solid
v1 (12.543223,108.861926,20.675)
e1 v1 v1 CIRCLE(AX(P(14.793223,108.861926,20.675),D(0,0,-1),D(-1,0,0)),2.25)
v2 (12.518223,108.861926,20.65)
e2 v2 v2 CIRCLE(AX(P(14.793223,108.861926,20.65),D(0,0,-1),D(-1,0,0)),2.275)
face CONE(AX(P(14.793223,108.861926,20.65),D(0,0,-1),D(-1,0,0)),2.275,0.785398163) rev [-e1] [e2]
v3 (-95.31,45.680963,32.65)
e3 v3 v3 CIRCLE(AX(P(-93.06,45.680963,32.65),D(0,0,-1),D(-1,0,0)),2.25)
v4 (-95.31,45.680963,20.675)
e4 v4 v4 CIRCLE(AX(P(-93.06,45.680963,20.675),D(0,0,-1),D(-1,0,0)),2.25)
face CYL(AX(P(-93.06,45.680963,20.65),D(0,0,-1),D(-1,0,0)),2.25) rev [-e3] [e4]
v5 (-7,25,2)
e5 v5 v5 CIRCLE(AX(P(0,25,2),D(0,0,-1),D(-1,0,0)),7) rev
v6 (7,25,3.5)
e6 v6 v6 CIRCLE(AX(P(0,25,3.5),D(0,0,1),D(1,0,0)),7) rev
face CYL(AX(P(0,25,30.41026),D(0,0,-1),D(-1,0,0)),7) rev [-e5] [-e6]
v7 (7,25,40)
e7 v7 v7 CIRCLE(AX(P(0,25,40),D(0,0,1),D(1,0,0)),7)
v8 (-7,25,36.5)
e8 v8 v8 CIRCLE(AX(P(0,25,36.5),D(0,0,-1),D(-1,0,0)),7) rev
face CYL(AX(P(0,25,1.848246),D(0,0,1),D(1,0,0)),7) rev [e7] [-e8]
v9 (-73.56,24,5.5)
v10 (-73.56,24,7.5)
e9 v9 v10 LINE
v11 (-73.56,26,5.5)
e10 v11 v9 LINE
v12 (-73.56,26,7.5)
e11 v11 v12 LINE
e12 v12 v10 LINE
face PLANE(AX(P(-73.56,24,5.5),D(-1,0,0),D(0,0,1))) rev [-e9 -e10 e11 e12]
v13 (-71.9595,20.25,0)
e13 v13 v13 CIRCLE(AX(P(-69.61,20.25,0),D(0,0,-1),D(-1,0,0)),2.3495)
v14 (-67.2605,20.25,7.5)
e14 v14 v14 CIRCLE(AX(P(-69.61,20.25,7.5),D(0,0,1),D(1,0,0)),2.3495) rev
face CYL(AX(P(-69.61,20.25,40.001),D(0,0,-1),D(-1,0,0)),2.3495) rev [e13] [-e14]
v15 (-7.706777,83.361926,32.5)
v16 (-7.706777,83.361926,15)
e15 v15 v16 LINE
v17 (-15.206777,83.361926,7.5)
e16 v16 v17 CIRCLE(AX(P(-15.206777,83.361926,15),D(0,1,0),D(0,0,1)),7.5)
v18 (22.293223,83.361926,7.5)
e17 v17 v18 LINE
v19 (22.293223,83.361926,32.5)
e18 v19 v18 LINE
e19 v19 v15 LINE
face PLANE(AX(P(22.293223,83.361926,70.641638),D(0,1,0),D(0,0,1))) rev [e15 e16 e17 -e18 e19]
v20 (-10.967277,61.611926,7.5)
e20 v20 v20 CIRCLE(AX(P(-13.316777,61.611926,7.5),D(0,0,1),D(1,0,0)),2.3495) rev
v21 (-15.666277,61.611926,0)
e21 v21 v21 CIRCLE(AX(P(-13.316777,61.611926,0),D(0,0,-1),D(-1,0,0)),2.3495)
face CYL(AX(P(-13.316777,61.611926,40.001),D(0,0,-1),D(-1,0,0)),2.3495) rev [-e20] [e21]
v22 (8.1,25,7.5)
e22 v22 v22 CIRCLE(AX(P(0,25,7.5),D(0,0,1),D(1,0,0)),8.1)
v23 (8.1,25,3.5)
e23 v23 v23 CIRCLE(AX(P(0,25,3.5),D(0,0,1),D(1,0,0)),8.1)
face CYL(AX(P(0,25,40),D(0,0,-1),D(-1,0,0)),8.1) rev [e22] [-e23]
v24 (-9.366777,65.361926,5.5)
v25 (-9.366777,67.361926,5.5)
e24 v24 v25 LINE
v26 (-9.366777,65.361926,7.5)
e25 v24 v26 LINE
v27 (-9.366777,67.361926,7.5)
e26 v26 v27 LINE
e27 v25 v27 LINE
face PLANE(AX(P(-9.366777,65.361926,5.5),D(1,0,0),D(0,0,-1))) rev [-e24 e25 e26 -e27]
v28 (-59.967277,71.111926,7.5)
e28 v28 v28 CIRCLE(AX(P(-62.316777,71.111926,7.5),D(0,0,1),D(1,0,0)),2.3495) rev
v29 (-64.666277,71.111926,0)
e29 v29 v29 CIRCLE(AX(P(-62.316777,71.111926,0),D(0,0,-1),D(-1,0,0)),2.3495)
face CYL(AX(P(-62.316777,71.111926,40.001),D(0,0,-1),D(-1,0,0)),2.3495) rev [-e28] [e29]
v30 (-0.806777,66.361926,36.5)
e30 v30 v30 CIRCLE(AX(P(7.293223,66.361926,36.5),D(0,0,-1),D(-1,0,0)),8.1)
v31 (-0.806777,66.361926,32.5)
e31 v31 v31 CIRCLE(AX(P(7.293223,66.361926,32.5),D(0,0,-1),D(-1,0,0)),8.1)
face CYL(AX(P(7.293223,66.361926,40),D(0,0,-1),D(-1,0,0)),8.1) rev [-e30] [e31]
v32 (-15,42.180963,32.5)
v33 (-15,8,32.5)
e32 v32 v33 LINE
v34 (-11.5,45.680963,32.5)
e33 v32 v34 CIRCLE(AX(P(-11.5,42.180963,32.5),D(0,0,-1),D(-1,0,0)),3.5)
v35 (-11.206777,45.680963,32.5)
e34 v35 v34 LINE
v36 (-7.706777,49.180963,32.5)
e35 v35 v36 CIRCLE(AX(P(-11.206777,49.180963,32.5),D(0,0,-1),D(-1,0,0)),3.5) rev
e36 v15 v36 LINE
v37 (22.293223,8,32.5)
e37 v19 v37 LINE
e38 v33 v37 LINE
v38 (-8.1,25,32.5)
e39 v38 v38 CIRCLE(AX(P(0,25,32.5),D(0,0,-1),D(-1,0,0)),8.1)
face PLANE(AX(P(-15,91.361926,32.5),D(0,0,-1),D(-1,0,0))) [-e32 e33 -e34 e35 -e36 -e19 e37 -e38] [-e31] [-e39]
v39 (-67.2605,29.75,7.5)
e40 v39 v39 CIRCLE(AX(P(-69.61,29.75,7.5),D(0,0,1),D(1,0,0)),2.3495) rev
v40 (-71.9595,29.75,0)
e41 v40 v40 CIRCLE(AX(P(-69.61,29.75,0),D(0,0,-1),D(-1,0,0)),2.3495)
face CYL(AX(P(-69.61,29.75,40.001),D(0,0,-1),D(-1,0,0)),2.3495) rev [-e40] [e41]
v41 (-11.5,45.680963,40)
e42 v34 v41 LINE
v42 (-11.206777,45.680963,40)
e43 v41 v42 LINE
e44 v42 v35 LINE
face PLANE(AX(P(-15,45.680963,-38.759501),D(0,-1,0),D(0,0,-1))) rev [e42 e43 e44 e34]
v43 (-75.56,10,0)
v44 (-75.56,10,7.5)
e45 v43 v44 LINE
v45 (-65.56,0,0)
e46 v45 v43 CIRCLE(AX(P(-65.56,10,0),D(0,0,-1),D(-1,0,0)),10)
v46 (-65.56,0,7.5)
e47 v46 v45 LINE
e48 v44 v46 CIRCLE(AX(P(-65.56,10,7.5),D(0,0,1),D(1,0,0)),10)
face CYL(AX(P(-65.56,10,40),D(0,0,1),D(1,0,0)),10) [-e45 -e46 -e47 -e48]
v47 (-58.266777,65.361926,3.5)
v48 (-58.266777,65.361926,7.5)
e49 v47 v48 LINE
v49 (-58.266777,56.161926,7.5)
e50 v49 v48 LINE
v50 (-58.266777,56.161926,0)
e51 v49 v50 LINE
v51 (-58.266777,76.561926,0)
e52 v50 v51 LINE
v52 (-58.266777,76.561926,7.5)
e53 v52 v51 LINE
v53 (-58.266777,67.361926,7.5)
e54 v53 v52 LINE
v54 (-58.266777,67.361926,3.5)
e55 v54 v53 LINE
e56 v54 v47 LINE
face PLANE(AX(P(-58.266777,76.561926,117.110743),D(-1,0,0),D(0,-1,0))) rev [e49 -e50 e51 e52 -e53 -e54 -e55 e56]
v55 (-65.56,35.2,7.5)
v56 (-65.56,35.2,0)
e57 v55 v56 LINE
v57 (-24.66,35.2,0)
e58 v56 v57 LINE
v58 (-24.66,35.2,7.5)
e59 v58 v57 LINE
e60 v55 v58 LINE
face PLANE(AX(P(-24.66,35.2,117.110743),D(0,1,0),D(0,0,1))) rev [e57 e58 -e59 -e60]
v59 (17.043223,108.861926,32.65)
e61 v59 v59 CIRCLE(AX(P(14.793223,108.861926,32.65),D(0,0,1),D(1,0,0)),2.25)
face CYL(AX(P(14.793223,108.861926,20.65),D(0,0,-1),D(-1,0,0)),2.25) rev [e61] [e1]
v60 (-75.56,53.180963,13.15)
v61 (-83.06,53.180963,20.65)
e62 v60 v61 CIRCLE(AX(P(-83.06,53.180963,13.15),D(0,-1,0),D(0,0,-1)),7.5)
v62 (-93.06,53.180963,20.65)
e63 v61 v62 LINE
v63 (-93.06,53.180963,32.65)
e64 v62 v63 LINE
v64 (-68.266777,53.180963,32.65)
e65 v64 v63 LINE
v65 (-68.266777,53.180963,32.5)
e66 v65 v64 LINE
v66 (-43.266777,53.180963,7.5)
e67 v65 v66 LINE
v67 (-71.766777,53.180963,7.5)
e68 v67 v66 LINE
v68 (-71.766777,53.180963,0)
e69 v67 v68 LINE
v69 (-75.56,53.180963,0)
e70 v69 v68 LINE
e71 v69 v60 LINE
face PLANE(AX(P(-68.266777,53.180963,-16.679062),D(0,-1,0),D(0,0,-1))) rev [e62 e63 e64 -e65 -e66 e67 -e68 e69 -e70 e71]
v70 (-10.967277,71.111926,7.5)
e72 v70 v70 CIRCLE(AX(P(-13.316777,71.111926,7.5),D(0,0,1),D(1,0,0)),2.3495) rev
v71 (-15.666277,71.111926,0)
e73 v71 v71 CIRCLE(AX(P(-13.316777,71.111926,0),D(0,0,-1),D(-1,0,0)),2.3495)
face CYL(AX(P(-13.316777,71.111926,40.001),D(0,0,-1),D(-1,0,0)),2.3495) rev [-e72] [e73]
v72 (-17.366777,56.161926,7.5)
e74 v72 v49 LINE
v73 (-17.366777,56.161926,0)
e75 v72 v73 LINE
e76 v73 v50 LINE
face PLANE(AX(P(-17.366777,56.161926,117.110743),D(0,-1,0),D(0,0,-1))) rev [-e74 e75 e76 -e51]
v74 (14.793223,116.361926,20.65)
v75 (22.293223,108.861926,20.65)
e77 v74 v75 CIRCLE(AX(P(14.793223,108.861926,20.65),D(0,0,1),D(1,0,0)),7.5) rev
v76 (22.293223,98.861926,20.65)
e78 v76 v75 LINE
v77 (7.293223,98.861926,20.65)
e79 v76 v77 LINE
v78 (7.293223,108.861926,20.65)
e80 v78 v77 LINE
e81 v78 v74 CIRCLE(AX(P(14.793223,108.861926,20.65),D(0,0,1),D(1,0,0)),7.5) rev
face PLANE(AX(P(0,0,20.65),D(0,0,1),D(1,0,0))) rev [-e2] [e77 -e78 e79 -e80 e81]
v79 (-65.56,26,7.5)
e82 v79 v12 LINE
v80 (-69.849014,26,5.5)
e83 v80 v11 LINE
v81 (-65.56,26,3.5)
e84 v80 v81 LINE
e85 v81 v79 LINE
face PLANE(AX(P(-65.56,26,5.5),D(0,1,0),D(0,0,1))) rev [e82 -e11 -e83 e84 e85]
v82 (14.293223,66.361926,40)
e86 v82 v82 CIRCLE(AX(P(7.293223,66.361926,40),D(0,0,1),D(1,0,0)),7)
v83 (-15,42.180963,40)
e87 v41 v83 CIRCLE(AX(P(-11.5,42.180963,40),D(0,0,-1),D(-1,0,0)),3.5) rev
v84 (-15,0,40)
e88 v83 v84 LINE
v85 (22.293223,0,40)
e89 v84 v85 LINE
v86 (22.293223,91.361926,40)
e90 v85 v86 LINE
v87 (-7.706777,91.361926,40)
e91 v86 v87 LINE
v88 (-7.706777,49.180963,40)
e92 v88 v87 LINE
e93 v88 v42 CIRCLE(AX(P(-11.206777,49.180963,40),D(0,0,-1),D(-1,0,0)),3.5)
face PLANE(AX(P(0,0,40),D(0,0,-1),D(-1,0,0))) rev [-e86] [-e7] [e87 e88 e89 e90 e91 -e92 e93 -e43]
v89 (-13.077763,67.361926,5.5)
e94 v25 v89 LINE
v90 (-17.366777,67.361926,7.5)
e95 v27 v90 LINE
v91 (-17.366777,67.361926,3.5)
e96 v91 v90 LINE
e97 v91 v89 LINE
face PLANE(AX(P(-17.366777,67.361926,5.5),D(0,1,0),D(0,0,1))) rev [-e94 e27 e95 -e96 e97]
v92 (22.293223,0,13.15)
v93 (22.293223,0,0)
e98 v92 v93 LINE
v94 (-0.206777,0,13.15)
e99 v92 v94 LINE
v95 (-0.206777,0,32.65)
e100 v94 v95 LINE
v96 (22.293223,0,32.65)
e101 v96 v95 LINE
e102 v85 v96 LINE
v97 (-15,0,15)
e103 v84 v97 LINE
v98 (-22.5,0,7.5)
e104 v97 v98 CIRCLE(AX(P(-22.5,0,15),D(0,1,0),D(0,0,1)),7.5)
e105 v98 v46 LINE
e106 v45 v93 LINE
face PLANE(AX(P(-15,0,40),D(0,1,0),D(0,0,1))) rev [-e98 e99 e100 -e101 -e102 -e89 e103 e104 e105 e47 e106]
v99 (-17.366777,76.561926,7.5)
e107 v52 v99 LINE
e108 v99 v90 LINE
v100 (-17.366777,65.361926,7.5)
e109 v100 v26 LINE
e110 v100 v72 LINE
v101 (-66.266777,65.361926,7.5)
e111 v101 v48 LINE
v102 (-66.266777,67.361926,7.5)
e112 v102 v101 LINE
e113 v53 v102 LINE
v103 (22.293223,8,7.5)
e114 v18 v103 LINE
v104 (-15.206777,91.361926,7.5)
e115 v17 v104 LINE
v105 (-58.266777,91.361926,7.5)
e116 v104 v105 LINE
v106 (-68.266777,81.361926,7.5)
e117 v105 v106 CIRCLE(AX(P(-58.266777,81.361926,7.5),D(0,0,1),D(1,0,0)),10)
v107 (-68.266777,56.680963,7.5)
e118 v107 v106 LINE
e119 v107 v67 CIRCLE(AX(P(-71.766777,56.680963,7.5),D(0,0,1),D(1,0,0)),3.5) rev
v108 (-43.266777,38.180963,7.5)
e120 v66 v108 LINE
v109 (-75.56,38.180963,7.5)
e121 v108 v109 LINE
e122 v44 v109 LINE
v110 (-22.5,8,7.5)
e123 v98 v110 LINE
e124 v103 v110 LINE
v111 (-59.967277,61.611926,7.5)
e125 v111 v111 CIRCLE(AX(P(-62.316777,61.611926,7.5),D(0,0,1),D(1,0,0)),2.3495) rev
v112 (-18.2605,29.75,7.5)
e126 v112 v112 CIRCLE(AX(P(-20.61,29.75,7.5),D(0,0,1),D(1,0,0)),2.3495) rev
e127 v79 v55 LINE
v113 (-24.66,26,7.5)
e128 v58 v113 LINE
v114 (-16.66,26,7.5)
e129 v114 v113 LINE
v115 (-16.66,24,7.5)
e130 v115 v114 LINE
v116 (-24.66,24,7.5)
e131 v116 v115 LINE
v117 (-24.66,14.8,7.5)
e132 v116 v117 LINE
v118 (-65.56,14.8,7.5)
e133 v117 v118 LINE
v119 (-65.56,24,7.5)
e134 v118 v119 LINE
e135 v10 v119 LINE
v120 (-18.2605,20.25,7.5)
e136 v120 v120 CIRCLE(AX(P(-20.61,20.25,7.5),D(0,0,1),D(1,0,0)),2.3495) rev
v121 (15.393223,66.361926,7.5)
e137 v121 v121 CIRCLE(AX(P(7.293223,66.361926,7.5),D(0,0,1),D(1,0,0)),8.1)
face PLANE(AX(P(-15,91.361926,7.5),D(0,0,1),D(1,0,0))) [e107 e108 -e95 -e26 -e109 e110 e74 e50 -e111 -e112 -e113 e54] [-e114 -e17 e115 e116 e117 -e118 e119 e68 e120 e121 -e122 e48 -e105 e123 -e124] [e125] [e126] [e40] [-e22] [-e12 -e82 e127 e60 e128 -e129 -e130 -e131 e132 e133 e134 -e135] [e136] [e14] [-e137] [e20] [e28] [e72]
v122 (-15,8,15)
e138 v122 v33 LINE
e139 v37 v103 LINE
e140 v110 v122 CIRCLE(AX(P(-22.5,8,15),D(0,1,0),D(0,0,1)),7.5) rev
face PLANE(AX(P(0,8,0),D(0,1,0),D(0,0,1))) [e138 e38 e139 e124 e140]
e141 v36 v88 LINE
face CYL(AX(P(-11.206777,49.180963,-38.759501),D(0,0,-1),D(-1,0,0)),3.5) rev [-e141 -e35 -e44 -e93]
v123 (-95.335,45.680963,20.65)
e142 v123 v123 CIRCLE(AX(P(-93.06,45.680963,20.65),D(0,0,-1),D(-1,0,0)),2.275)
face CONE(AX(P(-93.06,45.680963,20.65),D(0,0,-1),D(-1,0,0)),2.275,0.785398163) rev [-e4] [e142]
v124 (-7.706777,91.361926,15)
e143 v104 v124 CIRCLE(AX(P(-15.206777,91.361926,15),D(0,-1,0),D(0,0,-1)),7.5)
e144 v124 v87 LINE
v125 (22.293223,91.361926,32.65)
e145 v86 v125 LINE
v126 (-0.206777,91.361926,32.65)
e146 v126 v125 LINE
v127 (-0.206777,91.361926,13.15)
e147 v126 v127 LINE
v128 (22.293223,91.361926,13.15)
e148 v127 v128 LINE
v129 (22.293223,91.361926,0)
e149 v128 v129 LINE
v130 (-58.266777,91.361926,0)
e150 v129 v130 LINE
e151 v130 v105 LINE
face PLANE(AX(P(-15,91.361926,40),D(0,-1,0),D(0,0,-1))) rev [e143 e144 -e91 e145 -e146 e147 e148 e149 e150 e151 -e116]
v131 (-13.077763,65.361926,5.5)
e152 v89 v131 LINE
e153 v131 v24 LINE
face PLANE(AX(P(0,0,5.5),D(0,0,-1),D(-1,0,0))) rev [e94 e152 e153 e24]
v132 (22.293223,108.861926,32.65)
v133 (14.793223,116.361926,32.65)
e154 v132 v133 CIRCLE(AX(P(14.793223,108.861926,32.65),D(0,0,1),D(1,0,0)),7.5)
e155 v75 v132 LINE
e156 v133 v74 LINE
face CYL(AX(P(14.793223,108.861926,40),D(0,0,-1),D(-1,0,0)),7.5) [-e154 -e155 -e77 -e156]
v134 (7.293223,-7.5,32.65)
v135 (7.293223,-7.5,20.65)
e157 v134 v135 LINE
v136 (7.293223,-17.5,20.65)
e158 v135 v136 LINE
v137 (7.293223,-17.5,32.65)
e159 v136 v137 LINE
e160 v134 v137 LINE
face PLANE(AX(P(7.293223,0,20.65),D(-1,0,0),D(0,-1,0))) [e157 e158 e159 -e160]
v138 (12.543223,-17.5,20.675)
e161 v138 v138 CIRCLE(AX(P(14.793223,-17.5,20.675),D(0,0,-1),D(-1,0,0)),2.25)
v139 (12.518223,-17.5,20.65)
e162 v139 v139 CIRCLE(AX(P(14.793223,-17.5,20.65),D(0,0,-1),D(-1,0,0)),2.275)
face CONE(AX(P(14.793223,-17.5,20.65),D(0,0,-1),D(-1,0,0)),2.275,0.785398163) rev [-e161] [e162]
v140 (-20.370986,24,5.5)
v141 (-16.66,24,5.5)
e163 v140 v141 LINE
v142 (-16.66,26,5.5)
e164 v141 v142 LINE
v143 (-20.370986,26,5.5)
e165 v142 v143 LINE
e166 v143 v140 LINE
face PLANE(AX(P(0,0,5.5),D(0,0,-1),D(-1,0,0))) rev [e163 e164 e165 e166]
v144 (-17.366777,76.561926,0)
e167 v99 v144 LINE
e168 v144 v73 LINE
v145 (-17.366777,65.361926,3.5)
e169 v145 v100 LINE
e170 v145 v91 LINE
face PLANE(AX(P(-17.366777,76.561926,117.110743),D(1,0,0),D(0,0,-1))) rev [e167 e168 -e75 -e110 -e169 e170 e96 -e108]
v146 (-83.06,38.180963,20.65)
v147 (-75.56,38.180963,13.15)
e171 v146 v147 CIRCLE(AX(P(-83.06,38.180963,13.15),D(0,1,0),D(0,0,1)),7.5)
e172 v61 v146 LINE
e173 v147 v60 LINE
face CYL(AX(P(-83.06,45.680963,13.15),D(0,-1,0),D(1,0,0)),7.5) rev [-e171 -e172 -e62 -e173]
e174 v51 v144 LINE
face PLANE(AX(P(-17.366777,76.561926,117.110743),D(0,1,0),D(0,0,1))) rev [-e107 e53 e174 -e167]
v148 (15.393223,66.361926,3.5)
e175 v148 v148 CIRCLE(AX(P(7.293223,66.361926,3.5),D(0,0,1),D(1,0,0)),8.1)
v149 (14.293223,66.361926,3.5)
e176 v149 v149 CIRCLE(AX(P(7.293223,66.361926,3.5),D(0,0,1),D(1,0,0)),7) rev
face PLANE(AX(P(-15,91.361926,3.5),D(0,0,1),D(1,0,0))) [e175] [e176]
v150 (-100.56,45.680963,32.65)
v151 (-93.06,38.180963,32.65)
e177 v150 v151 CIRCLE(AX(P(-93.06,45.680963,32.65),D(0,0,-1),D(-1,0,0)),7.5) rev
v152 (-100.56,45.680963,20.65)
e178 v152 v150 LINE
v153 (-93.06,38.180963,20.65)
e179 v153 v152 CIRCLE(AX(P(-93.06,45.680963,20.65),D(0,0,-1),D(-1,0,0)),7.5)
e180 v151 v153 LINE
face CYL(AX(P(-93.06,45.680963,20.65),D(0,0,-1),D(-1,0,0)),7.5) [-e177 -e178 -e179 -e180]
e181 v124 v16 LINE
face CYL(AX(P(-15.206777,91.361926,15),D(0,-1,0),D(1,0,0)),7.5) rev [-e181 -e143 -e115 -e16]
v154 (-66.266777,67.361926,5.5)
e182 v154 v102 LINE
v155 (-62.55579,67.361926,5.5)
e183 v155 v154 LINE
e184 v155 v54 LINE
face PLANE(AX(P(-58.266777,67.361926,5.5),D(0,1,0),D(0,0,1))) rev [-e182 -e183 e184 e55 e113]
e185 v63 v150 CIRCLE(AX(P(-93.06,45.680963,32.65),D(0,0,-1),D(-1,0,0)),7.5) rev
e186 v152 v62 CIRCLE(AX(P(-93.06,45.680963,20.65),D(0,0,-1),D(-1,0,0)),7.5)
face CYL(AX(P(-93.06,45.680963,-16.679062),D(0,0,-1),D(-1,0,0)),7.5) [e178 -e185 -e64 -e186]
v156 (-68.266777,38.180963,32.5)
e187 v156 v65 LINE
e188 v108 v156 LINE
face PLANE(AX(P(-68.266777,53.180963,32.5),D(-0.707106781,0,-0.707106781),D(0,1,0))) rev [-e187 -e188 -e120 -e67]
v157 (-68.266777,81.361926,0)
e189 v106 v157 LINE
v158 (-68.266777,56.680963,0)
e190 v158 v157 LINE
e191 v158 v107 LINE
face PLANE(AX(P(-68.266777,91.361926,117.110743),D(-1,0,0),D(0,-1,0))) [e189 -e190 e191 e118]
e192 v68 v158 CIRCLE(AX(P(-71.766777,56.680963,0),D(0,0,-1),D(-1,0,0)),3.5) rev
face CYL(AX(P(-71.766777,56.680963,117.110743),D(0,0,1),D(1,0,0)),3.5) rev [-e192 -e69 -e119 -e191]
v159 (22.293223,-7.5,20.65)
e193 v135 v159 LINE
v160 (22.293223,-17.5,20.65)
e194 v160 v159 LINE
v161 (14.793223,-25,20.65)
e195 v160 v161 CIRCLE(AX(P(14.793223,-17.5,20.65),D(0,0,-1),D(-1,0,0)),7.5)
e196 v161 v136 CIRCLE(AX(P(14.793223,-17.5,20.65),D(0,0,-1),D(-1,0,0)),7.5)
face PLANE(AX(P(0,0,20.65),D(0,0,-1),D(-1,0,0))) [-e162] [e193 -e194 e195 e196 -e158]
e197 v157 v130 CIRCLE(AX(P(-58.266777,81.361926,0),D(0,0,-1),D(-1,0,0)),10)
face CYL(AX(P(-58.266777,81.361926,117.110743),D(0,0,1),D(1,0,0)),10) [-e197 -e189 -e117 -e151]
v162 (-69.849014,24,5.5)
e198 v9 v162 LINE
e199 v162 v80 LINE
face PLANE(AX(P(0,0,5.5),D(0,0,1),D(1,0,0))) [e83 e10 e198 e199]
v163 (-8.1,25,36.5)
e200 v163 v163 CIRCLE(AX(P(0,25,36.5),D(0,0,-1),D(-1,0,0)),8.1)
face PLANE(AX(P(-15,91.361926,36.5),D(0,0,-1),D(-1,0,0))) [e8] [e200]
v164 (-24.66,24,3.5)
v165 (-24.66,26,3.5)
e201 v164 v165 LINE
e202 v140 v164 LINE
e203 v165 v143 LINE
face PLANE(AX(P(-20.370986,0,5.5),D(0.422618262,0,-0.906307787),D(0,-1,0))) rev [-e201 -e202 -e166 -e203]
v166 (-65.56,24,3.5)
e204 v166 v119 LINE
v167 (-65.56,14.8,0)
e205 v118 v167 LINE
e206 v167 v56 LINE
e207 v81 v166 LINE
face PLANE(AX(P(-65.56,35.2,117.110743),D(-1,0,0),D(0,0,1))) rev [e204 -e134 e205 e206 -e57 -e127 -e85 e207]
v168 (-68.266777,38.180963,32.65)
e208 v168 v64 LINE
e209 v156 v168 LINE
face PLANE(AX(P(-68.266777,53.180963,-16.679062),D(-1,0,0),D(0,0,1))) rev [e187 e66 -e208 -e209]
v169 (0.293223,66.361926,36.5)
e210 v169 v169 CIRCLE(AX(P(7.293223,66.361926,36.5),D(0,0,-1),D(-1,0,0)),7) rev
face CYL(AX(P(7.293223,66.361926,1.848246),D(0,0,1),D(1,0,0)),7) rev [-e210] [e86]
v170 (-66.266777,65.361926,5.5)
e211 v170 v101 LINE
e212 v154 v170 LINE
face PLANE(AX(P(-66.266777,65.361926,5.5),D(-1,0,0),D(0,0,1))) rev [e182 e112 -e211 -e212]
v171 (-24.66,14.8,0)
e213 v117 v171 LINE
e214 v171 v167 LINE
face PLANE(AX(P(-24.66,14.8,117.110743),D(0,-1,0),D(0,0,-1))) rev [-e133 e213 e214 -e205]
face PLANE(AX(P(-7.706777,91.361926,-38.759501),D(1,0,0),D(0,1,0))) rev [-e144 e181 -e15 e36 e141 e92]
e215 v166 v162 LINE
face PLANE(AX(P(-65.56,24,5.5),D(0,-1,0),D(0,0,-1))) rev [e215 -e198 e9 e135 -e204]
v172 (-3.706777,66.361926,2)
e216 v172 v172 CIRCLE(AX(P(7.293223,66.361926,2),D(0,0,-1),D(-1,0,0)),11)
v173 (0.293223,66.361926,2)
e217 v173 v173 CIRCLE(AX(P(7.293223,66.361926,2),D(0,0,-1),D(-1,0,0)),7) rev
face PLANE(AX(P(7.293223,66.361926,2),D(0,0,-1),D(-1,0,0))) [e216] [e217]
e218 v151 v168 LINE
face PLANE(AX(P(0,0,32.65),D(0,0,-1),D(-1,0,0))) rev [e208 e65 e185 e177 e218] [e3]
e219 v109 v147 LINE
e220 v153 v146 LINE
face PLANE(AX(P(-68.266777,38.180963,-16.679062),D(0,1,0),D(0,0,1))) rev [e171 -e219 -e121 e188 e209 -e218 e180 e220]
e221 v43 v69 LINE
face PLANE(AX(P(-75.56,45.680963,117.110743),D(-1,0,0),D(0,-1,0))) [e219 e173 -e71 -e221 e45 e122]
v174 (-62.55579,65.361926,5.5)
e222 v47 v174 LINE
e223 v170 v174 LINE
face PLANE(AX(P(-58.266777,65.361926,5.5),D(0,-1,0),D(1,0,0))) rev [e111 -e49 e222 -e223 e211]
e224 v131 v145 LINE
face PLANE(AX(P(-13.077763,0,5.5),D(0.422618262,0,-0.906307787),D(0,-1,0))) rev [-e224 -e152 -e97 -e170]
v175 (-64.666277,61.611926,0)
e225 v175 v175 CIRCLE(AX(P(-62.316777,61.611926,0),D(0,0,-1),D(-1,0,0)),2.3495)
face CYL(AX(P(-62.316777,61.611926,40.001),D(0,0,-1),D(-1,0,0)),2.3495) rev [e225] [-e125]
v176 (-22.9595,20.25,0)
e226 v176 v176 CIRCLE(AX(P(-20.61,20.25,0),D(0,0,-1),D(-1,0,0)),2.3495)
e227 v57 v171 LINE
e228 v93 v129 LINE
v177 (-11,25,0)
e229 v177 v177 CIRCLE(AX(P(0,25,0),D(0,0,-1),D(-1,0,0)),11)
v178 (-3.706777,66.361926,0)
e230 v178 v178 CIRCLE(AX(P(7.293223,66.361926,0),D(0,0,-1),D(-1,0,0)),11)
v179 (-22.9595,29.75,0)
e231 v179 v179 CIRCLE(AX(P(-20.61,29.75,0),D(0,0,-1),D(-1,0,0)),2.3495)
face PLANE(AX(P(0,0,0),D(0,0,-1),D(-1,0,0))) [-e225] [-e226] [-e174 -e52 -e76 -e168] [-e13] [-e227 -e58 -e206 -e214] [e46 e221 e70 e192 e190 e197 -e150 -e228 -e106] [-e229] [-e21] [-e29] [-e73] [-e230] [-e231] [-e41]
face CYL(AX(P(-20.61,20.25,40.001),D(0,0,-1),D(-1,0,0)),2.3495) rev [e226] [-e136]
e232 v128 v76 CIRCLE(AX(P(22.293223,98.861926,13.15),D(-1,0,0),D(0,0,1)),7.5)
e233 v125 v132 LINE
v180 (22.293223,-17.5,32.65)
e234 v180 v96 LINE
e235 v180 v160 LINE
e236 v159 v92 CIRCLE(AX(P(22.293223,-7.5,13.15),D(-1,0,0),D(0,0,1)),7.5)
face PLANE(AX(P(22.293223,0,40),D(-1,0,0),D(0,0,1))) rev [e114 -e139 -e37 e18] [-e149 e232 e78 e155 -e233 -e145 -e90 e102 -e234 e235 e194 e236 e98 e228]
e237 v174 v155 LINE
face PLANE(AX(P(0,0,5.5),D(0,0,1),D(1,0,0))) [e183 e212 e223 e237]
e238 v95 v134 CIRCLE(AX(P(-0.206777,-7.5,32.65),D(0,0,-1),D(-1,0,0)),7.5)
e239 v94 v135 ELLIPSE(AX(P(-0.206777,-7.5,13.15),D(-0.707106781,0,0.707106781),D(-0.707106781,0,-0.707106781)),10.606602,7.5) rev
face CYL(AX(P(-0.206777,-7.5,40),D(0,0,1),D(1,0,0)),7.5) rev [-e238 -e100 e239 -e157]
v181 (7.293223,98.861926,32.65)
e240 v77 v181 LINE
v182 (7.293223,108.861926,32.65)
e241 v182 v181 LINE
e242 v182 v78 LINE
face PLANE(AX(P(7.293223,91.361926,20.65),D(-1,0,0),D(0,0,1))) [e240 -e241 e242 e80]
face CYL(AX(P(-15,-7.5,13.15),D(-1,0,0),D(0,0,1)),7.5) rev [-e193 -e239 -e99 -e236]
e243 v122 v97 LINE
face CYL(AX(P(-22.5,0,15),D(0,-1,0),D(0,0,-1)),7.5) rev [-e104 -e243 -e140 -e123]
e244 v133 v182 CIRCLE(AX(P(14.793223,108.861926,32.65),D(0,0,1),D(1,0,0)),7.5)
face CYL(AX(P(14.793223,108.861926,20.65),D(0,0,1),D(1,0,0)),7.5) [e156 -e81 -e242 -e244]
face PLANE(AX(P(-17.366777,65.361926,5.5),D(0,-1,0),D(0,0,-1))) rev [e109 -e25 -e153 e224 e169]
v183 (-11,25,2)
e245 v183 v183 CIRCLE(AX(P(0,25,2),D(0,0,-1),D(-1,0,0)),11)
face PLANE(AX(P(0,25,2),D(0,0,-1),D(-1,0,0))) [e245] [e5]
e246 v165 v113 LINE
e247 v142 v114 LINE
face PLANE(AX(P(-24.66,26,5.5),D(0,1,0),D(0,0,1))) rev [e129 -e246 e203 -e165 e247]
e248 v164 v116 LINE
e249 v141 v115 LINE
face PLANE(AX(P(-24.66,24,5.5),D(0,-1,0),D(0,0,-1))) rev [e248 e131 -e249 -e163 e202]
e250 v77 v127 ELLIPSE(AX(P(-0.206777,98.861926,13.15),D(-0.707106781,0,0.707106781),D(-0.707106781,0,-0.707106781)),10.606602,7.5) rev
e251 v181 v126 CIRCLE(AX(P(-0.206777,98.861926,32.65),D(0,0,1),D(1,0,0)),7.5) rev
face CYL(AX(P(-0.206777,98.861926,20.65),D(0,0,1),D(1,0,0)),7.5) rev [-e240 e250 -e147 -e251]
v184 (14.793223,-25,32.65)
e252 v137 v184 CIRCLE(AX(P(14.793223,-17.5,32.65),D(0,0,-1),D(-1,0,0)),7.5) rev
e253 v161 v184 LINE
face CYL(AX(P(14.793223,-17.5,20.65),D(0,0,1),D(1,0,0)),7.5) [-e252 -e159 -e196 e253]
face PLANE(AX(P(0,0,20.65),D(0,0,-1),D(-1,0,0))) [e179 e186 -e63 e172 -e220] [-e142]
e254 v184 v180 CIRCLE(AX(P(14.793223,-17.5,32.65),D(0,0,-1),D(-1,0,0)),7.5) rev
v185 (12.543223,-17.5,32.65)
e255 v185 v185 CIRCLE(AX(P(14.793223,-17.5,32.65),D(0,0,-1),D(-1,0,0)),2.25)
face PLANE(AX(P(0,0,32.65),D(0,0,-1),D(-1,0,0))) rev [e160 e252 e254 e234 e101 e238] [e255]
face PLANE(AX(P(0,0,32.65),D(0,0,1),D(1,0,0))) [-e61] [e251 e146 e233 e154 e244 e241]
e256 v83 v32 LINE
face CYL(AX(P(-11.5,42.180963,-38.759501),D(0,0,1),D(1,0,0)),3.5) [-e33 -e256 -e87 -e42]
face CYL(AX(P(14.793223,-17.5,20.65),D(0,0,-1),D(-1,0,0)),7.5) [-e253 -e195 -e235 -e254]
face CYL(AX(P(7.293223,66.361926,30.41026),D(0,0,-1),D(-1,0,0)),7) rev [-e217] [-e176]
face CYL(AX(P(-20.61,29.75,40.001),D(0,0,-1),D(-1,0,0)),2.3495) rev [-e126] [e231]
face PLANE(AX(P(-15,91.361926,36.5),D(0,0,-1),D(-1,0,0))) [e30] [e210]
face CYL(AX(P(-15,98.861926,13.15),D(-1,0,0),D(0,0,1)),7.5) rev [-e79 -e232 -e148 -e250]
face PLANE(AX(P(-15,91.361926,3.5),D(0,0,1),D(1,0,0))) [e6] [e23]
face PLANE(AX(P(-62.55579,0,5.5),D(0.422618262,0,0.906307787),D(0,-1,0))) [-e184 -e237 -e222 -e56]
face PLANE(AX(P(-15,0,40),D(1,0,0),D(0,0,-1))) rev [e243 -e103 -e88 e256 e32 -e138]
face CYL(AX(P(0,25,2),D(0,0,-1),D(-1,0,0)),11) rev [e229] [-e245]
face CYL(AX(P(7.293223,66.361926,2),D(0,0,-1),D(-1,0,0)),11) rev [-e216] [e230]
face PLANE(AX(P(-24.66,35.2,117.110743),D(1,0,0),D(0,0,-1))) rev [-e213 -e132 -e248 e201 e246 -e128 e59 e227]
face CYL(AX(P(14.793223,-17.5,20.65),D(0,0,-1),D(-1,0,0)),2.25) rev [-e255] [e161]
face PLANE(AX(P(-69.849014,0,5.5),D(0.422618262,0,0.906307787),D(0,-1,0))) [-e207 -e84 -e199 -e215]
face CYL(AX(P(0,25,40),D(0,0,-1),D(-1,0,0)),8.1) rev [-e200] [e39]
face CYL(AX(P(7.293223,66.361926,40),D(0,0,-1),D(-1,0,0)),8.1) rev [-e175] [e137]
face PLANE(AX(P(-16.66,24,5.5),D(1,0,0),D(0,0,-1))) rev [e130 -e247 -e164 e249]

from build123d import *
from OCP.BRepFilletAPI import BRepFilletAPI_MakeChamfer

# Parameters (mm, degrees)
SKETCH1_W                      = 37.293223462
SKETCH1_H                      = 91.361925627
SKETCH1_R                      = 8.1
BOSS_EXTRUDE1_DEPTH            = 40
CUT_EXTRUDE1_START             = 8
SKETCH2_W                      = 37.293223462
SKETCH2_H                      = 25
CUT_EXTRUDE1_DEPTH             = 95.195837814
BOSS_EXTRUDE2_START            = -3.5
SKETCH10_R                     = 8.1
SKETCH10_R_2                   = 7
SKETCH10_R_3                   = 10.837031589
BOSS_EXTRUDE2_DEPTH            = 3.5
SKETCH11_R                     = 8.1
SKETCH11_R_2                   = 7
BOSS_EXTRUDE3_DEPTH            = 3.5
SKETCH12_W                     = 40.9
SKETCH12_H                     = 20.4
BOSS_EXTRUDE4_DEPTH            = 7.5
CUT_EXTRUDE2_REACH             = 127.125
SKETCH13_R                     = 2.3495
SKETCH22_W                     = 8
SKETCH22_H                     = 2
CUT_EXTRUDE6_DEPTH             = 2
SKETCH14_W                     = 37.293223462
SKETCH14_H                     = 8
BOSS_EXTRUDE5_DEPTH            = 25
CUT_EXTRUDE4_START             = -32.5
SKETCH18_W                     = 7.293223462
SKETCH18_H                     = 45.680962814
CUT_EXTRUDE4_DEPTH             = 32.5
SKETCH15_R                     = 11
CUT_EXTRUDE3_DEPTH             = 2
SKETCH19_W                     = 15
SKETCH19_H                     = 25
BOSS_EXTRUDE6_DEPTH            = 12
SKETCH20_W                     = 32.293223462
SKETCH20_H                     = 15
BOSS_EXTRUDE7_DEPTH            = 12
SKETCH21_W                     = 7.293223462
SKETCH21_H                     = 15
BOSS_EXTRUDE8_DEPTH            = 20.65
CHAMFER2_SIZE                  = 2
CHAMFER2_SIZE2                 = 4.289013841
FILLET1_R                      = 7.5
CHAMFER1_SIZE                  = 25
M4_CLEARANCE_HOLE1_D           = 4.5
M4_CLEARANCE_HOLE1_CSINK_D     = 4.55
M4_CLEARANCE_HOLE1_CSINK_ANGLE = 90
FILLET2_R                      = 10
FILLET3_R                      = 3.5


with BuildPart() as part:
    # Sketch1 → Boss-Extrude1 (new body)
    with BuildSketch(Plane.XY):
        with Locations((3.646611731, 45.680962814)):
            Rectangle(SKETCH1_W, SKETCH1_H)
        with Locations((0, 25)):
            Circle(SKETCH1_R, mode=Mode.SUBTRACT)
        with Locations((7.293223462, 66.361925627)):
            Circle(SKETCH1_R, mode=Mode.SUBTRACT)
    extrude(amount=BOSS_EXTRUDE1_DEPTH)

    # Sketch2 → Cut-Extrude1 (cut, through all)
    with BuildSketch(Plane(origin=(0, 0, 0), x_dir=(1, 0, 0), z_dir=(0, 1, 0)).offset(CUT_EXTRUDE1_START)):
        with Locations((3.646611731, -20)):
            Rectangle(SKETCH2_W, SKETCH2_H)
    extrude(amount=CUT_EXTRUDE1_DEPTH, mode=Mode.SUBTRACT)

    # Sketch10 → Boss-Extrude2 (add)
    # profile 1 of 2: a face of its own
    with BuildSketch(Plane.XY.offset(40).offset(BOSS_EXTRUDE2_START)):
        with Locations(Location((7.293223462, 66.361925627, 0), (0, 0, 180))):
            Circle(SKETCH10_R)
        with Locations((7.293223462, 66.361925627)):
            Circle(SKETCH10_R_2, mode=Mode.SUBTRACT)
    # profile 2 of 2: a face of its own
    with BuildSketch(Plane.XY.offset(40).offset(BOSS_EXTRUDE2_START)):
        with Locations((0, 25)):
            Circle(SKETCH10_R_3)
        with Locations((0, 25)):
            Circle(SKETCH10_R_2, mode=Mode.SUBTRACT)
    extrude(amount=BOSS_EXTRUDE2_DEPTH)

    # Sketch11 → Boss-Extrude3 (add)
    # profile 1 of 2: a face of its own
    with BuildSketch(Plane(origin=(0, 0, 0), x_dir=(-1, 0, 0), z_dir=(0, 0, -1))):
        with Locations((-7.293223462, 66.361925627)):
            Circle(SKETCH11_R)
        with Locations(Location((-7.293223462, 66.361925627, 0), (0, 0, 180))):
            Circle(SKETCH11_R_2, mode=Mode.SUBTRACT)
    # profile 2 of 2: a face of its own
    with BuildSketch(Plane(origin=(0, 0, 0), x_dir=(-1, 0, 0), z_dir=(0, 0, -1))):
        with Locations((0, 25)):
            Circle(SKETCH11_R)
        with Locations(Location((0, 25, 0), (0, 0, 180))):
            Circle(SKETCH11_R_2, mode=Mode.SUBTRACT)
    extrude(amount=-BOSS_EXTRUDE3_DEPTH)

    # Sketch12 → Boss-Extrude4 (add)
    with BuildSketch(Plane(origin=(0, 0, 0), x_dir=(-1, 0, 0), z_dir=(0, 0, -1))):
        Polygon((15, 0), (75.56, 0), (75.56, 45.680962813), (68.266776538, 45.680962813), (68.266776538, 91.361925627), (15, 91.361925627), align=None)
        with Locations((45.11, 25)):
            Rectangle(SKETCH12_W, SKETCH12_H, mode=Mode.SUBTRACT)
        with Locations((37.816776538, 66.361925627)):
            Rectangle(SKETCH12_W, SKETCH12_H, mode=Mode.SUBTRACT)
    extrude(amount=-BOSS_EXTRUDE4_DEPTH)

    # Sketch13 → Cut-Extrude2 (cut, up to next)
    with BuildSketch(Plane(origin=(0, 0, 0), x_dir=(-1, 0, 0), z_dir=(0, 0, -1)), mode=Mode.PRIVATE) as cut_extrude2_sk1:
        with Locations((20.61, 29.75)):
            Circle(SKETCH13_R)
    cut_extrude2_tool1 = extrude(cut_extrude2_sk1.sketch, amount=-CUT_EXTRUDE2_REACH, mode=Mode.PRIVATE) & part.part
    # Sketch13 → Cut-Extrude2 (cut, up to next)
    with BuildSketch(Plane(origin=(0, 0, 0), x_dir=(-1, 0, 0), z_dir=(0, 0, -1)), mode=Mode.PRIVATE) as cut_extrude2_sk2:
        with Locations((20.61, 20.25)):
            Circle(SKETCH13_R)
    cut_extrude2_tool2 = extrude(cut_extrude2_sk2.sketch, amount=-CUT_EXTRUDE2_REACH, mode=Mode.PRIVATE) & part.part
    # Sketch13 → Cut-Extrude2 (cut, up to next)
    with BuildSketch(Plane(origin=(0, 0, 0), x_dir=(-1, 0, 0), z_dir=(0, 0, -1)), mode=Mode.PRIVATE) as cut_extrude2_sk3:
        with Locations((69.61, 29.75)):
            Circle(SKETCH13_R)
    cut_extrude2_tool3 = extrude(cut_extrude2_sk3.sketch, amount=-CUT_EXTRUDE2_REACH, mode=Mode.PRIVATE) & part.part
    # Sketch13 → Cut-Extrude2 (cut, up to next)
    with BuildSketch(Plane(origin=(0, 0, 0), x_dir=(-1, 0, 0), z_dir=(0, 0, -1)), mode=Mode.PRIVATE) as cut_extrude2_sk4:
        with Locations((69.61, 20.25)):
            Circle(SKETCH13_R)
    cut_extrude2_tool4 = extrude(cut_extrude2_sk4.sketch, amount=-CUT_EXTRUDE2_REACH, mode=Mode.PRIVATE) & part.part
    # Sketch13 → Cut-Extrude2 (cut, up to next)
    with BuildSketch(Plane(origin=(0, 0, 0), x_dir=(-1, 0, 0), z_dir=(0, 0, -1)), mode=Mode.PRIVATE) as cut_extrude2_sk5:
        with Locations((13.316776538, 71.111925627)):
            Circle(SKETCH13_R)
    cut_extrude2_tool5 = extrude(cut_extrude2_sk5.sketch, amount=-CUT_EXTRUDE2_REACH, mode=Mode.PRIVATE) & part.part
    # Sketch13 → Cut-Extrude2 (cut, up to next)
    with BuildSketch(Plane(origin=(0, 0, 0), x_dir=(-1, 0, 0), z_dir=(0, 0, -1)), mode=Mode.PRIVATE) as cut_extrude2_sk6:
        with Locations((13.316776538, 61.611925627)):
            Circle(SKETCH13_R)
    cut_extrude2_tool6 = extrude(cut_extrude2_sk6.sketch, amount=-CUT_EXTRUDE2_REACH, mode=Mode.PRIVATE) & part.part
    # Sketch13 → Cut-Extrude2 (cut, up to next)
    with BuildSketch(Plane(origin=(0, 0, 0), x_dir=(-1, 0, 0), z_dir=(0, 0, -1)), mode=Mode.PRIVATE) as cut_extrude2_sk7:
        with Locations((62.316776538, 71.111925627)):
            Circle(SKETCH13_R)
    cut_extrude2_tool7 = extrude(cut_extrude2_sk7.sketch, amount=-CUT_EXTRUDE2_REACH, mode=Mode.PRIVATE) & part.part
    # Sketch13 → Cut-Extrude2 (cut, up to next)
    with BuildSketch(Plane(origin=(0, 0, 0), x_dir=(-1, 0, 0), z_dir=(0, 0, -1)), mode=Mode.PRIVATE) as cut_extrude2_sk8:
        with Locations((62.316776538, 61.611925627)):
            Circle(SKETCH13_R)
    cut_extrude2_tool8 = extrude(cut_extrude2_sk8.sketch, amount=-CUT_EXTRUDE2_REACH, mode=Mode.PRIVATE) & part.part
    add(cut_extrude2_tool1.solids().sort_by_distance((-20.61, 29.75, 0))[0], mode=Mode.SUBTRACT)
    add(cut_extrude2_tool2.solids().sort_by_distance((-20.61, 20.25, 0))[0], mode=Mode.SUBTRACT)
    add(cut_extrude2_tool3.solids().sort_by_distance((-69.61, 29.75, 0))[0], mode=Mode.SUBTRACT)
    add(cut_extrude2_tool4.solids().sort_by_distance((-69.61, 20.25, 0))[0], mode=Mode.SUBTRACT)
    add(cut_extrude2_tool5.solids().sort_by_distance((-13.316777, 71.111926, 0))[0], mode=Mode.SUBTRACT)
    add(cut_extrude2_tool6.solids().sort_by_distance((-13.316777, 61.611926, 0))[0], mode=Mode.SUBTRACT)
    add(cut_extrude2_tool7.solids().sort_by_distance((-62.316777, 71.111926, 0))[0], mode=Mode.SUBTRACT)
    add(cut_extrude2_tool8.solids().sort_by_distance((-62.316777, 61.611926, 0))[0], mode=Mode.SUBTRACT)

    # Sketch22 → Cut-Extrude6 (cut)
    with BuildSketch(Plane.XY.offset(7.5)):
        with Locations((-62.266776538, 66.361925627)):
            Rectangle(SKETCH22_W, SKETCH22_H)
        with Locations((-13.366776538, 66.361925627)):
            Rectangle(SKETCH22_W, SKETCH22_H)
        with Locations((-20.66, 25)):
            Rectangle(SKETCH22_W, SKETCH22_H)
        with Locations((-69.56, 25)):
            Rectangle(SKETCH22_W, SKETCH22_H)
    extrude(amount=-CUT_EXTRUDE6_DEPTH, mode=Mode.SUBTRACT)

    # Sketch14 → Boss-Extrude5 (add)
    with BuildSketch(Plane.XY.offset(7.5)):
        with Locations((3.646611731, 87.361925627)):
            Rectangle(SKETCH14_W, SKETCH14_H)
    extrude(amount=BOSS_EXTRUDE5_DEPTH)

    # Sketch18 → Cut-Extrude4 (cut)
    with BuildSketch(Plane.XY.offset(40).offset(CUT_EXTRUDE4_START)):
        with Locations((-11.353388269, 68.52144422)):
            Rectangle(SKETCH18_W, SKETCH18_H)
    extrude(amount=CUT_EXTRUDE4_DEPTH, mode=Mode.SUBTRACT)

    # Sketch15 → Cut-Extrude3 (cut)
    with BuildSketch(Plane(origin=(0, 0, 0), x_dir=(-1, 0, 0), z_dir=(0, 0, -1))):
        with Locations((0, 25)):
            Circle(SKETCH15_R)
        with Locations((-7.293223462, 66.361925627)):
            Circle(SKETCH15_R)
    extrude(amount=-CUT_EXTRUDE3_DEPTH, mode=Mode.SUBTRACT)

    # Sketch19 → Boss-Extrude6 (add)
    with BuildSketch(Plane.XY.offset(32.65)):
        with Locations((14.793223462, 103.861925627)):
            Rectangle(SKETCH19_W, SKETCH19_H)
        with Locations((14.793223462, -12.5)):
            Rectangle(SKETCH19_W, SKETCH19_H)
    extrude(amount=-BOSS_EXTRUDE6_DEPTH)



with BuildPart() as body_2:
    # Sketch20 → Boss-Extrude7 (new body)
    with BuildSketch(Plane.XY.offset(32.65)):
        with Locations((-84.413388269, 45.680962813)):
            Rectangle(SKETCH20_W, SKETCH20_H)
    extrude(amount=-BOSS_EXTRUDE7_DEPTH)


with BuildPart() as part_1:
    add(part.part)

    add(body_2.part)  # Boss-Extrude8 merges body 2
    # Sketch21 → Boss-Extrude8 (add)
    with BuildSketch(Plane(origin=(0, 0, 20.65), x_dir=(-1, 0, 0), z_dir=(0, 0, -1))):
        with Locations((71.913388269, 45.680962813)):
            Rectangle(SKETCH21_W, SKETCH21_H)
    extrude(amount=BOSS_EXTRUDE8_DEPTH)

    # Chamfer2: one chamfer whose edges measure the first distance from different faces: ONE call of the kernel's chamfer builder (chamfer() names one face for all edges)
    chamfer2_edges_1 = [part_1.edges().sort_by_distance(p)[0] for p in [
        (-65.56, 25, 5.5),
    ]]
    chamfer2_side_1 = [part_1.faces().sort_by_distance(p)[0] for p in [
        (-65.56, 25, 3.676174497),
    ]]
    chamfer2_edges_2 = [part_1.edges().sort_by_distance(p)[0] for p in [
        (-24.66, 25, 5.5),
    ]]
    chamfer2_side_2 = [part_1.faces().sort_by_distance(p)[0] for p in [
        (-24.66, 25, 3.676174497),
    ]]
    chamfer2_edges_3 = [part_1.edges().sort_by_distance(p)[0] for p in [
        (-17.366776538, 66.361925627, 5.5),
    ]]
    chamfer2_side_3 = [part_1.faces().sort_by_distance(p)[0] for p in [
        (-17.366776538, 66.361925627, 3.676174497),
    ]]
    chamfer2_edges_4 = [part_1.edges().sort_by_distance(p)[0] for p in [
        (-58.266776538, 66.361925627, 5.5),
    ]]
    chamfer2_side_4 = [part_1.faces().sort_by_distance(p)[0] for p in [
        (-58.266776538, 66.361925627, 3.676174497),
    ]]
    chamfer2 = BRepFilletAPI_MakeChamfer(part_1.part.solid().wrapped)
    for e in chamfer2_edges_1:
        chamfer2.Add(CHAMFER2_SIZE, CHAMFER2_SIZE2, e.wrapped, chamfer2_side_1[0].wrapped)  # the first distance lies on this face
    for e in chamfer2_edges_2:
        chamfer2.Add(CHAMFER2_SIZE, CHAMFER2_SIZE2, e.wrapped, chamfer2_side_2[0].wrapped)  # the first distance lies on this face
    for e in chamfer2_edges_3:
        chamfer2.Add(CHAMFER2_SIZE, CHAMFER2_SIZE2, e.wrapped, chamfer2_side_3[0].wrapped)  # the first distance lies on this face
    for e in chamfer2_edges_4:
        chamfer2.Add(CHAMFER2_SIZE, CHAMFER2_SIZE2, e.wrapped, chamfer2_side_4[0].wrapped)  # the first distance lies on this face
    add(Compound.cast(chamfer2.Shape()), mode=Mode.REPLACE)

    # Fillet1
    fillet1_edges = [part_1.edges().sort_by_distance(p)[0] for p in [
        (-100.56, 53.180962813, 26.65),
        (-100.56, 38.180962813, 26.65),
        (-75.56, 45.680962813, 20.65),
        (7.293223462, 116.361925627, 26.65),
        (22.293223462, 116.361925627, 26.65),
        (7.293223462, -25, 26.65),
        (22.293223462, -25, 26.65),
        (14.793223462, 0, 20.65),
        (14.793223462, 91.361925627, 20.65),
        (7.293223462, 0, 26.65),
        (7.293223462, 91.361925627, 26.65),
        (-7.706776538, 87.361925627, 7.5),
        (-15, 4, 7.5),
    ]]
    fillet(fillet1_edges, radius=FILLET1_R - 0.0001)  # a hair under: the kernel refuses the full size

    # Chamfer1
    chamfer1_edges = [part_1.edges().sort_by_distance(p)[0] for p in [
        (-68.266776538, 45.680962813, 7.5),
    ]]
    chamfer(chamfer1_edges, length=CHAMFER1_SIZE)

    # M4 Clearance Hole1 (through all)
    with Locations(Plane(origin=(0, 0, 20.65), x_dir=(-1, 0, 0), z_dir=(0, 0, -1))):
        with Locations((-14.793223462, 108.861925627), (93.06, 45.680962813), (-14.793223462, -17.5)):
            CounterSinkHole(M4_CLEARANCE_HOLE1_D / 2, M4_CLEARANCE_HOLE1_CSINK_D / 2, counter_sink_angle=M4_CLEARANCE_HOLE1_CSINK_ANGLE)

    # Fillet2
    fillet2_edges = [part_1.edges().sort_by_distance(p)[0] for p in [
        (-68.266776538, 91.361925627, 3.75),
        (-75.56, 0, 3.75),
    ]]
    fillet(fillet2_edges, radius=FILLET2_R)

    # Fillet3
    fillet3_edges = [part_1.edges().sort_by_distance(p)[0] for p in [
        (-15, 45.680962813, 36.25),
        (-7.706776538, 45.680962813, 36.25),
        (-68.266776538, 53.180962813, 3.75),
    ]]
    fillet(fillet3_edges, radius=FILLET3_R)


solid = part_1.part
